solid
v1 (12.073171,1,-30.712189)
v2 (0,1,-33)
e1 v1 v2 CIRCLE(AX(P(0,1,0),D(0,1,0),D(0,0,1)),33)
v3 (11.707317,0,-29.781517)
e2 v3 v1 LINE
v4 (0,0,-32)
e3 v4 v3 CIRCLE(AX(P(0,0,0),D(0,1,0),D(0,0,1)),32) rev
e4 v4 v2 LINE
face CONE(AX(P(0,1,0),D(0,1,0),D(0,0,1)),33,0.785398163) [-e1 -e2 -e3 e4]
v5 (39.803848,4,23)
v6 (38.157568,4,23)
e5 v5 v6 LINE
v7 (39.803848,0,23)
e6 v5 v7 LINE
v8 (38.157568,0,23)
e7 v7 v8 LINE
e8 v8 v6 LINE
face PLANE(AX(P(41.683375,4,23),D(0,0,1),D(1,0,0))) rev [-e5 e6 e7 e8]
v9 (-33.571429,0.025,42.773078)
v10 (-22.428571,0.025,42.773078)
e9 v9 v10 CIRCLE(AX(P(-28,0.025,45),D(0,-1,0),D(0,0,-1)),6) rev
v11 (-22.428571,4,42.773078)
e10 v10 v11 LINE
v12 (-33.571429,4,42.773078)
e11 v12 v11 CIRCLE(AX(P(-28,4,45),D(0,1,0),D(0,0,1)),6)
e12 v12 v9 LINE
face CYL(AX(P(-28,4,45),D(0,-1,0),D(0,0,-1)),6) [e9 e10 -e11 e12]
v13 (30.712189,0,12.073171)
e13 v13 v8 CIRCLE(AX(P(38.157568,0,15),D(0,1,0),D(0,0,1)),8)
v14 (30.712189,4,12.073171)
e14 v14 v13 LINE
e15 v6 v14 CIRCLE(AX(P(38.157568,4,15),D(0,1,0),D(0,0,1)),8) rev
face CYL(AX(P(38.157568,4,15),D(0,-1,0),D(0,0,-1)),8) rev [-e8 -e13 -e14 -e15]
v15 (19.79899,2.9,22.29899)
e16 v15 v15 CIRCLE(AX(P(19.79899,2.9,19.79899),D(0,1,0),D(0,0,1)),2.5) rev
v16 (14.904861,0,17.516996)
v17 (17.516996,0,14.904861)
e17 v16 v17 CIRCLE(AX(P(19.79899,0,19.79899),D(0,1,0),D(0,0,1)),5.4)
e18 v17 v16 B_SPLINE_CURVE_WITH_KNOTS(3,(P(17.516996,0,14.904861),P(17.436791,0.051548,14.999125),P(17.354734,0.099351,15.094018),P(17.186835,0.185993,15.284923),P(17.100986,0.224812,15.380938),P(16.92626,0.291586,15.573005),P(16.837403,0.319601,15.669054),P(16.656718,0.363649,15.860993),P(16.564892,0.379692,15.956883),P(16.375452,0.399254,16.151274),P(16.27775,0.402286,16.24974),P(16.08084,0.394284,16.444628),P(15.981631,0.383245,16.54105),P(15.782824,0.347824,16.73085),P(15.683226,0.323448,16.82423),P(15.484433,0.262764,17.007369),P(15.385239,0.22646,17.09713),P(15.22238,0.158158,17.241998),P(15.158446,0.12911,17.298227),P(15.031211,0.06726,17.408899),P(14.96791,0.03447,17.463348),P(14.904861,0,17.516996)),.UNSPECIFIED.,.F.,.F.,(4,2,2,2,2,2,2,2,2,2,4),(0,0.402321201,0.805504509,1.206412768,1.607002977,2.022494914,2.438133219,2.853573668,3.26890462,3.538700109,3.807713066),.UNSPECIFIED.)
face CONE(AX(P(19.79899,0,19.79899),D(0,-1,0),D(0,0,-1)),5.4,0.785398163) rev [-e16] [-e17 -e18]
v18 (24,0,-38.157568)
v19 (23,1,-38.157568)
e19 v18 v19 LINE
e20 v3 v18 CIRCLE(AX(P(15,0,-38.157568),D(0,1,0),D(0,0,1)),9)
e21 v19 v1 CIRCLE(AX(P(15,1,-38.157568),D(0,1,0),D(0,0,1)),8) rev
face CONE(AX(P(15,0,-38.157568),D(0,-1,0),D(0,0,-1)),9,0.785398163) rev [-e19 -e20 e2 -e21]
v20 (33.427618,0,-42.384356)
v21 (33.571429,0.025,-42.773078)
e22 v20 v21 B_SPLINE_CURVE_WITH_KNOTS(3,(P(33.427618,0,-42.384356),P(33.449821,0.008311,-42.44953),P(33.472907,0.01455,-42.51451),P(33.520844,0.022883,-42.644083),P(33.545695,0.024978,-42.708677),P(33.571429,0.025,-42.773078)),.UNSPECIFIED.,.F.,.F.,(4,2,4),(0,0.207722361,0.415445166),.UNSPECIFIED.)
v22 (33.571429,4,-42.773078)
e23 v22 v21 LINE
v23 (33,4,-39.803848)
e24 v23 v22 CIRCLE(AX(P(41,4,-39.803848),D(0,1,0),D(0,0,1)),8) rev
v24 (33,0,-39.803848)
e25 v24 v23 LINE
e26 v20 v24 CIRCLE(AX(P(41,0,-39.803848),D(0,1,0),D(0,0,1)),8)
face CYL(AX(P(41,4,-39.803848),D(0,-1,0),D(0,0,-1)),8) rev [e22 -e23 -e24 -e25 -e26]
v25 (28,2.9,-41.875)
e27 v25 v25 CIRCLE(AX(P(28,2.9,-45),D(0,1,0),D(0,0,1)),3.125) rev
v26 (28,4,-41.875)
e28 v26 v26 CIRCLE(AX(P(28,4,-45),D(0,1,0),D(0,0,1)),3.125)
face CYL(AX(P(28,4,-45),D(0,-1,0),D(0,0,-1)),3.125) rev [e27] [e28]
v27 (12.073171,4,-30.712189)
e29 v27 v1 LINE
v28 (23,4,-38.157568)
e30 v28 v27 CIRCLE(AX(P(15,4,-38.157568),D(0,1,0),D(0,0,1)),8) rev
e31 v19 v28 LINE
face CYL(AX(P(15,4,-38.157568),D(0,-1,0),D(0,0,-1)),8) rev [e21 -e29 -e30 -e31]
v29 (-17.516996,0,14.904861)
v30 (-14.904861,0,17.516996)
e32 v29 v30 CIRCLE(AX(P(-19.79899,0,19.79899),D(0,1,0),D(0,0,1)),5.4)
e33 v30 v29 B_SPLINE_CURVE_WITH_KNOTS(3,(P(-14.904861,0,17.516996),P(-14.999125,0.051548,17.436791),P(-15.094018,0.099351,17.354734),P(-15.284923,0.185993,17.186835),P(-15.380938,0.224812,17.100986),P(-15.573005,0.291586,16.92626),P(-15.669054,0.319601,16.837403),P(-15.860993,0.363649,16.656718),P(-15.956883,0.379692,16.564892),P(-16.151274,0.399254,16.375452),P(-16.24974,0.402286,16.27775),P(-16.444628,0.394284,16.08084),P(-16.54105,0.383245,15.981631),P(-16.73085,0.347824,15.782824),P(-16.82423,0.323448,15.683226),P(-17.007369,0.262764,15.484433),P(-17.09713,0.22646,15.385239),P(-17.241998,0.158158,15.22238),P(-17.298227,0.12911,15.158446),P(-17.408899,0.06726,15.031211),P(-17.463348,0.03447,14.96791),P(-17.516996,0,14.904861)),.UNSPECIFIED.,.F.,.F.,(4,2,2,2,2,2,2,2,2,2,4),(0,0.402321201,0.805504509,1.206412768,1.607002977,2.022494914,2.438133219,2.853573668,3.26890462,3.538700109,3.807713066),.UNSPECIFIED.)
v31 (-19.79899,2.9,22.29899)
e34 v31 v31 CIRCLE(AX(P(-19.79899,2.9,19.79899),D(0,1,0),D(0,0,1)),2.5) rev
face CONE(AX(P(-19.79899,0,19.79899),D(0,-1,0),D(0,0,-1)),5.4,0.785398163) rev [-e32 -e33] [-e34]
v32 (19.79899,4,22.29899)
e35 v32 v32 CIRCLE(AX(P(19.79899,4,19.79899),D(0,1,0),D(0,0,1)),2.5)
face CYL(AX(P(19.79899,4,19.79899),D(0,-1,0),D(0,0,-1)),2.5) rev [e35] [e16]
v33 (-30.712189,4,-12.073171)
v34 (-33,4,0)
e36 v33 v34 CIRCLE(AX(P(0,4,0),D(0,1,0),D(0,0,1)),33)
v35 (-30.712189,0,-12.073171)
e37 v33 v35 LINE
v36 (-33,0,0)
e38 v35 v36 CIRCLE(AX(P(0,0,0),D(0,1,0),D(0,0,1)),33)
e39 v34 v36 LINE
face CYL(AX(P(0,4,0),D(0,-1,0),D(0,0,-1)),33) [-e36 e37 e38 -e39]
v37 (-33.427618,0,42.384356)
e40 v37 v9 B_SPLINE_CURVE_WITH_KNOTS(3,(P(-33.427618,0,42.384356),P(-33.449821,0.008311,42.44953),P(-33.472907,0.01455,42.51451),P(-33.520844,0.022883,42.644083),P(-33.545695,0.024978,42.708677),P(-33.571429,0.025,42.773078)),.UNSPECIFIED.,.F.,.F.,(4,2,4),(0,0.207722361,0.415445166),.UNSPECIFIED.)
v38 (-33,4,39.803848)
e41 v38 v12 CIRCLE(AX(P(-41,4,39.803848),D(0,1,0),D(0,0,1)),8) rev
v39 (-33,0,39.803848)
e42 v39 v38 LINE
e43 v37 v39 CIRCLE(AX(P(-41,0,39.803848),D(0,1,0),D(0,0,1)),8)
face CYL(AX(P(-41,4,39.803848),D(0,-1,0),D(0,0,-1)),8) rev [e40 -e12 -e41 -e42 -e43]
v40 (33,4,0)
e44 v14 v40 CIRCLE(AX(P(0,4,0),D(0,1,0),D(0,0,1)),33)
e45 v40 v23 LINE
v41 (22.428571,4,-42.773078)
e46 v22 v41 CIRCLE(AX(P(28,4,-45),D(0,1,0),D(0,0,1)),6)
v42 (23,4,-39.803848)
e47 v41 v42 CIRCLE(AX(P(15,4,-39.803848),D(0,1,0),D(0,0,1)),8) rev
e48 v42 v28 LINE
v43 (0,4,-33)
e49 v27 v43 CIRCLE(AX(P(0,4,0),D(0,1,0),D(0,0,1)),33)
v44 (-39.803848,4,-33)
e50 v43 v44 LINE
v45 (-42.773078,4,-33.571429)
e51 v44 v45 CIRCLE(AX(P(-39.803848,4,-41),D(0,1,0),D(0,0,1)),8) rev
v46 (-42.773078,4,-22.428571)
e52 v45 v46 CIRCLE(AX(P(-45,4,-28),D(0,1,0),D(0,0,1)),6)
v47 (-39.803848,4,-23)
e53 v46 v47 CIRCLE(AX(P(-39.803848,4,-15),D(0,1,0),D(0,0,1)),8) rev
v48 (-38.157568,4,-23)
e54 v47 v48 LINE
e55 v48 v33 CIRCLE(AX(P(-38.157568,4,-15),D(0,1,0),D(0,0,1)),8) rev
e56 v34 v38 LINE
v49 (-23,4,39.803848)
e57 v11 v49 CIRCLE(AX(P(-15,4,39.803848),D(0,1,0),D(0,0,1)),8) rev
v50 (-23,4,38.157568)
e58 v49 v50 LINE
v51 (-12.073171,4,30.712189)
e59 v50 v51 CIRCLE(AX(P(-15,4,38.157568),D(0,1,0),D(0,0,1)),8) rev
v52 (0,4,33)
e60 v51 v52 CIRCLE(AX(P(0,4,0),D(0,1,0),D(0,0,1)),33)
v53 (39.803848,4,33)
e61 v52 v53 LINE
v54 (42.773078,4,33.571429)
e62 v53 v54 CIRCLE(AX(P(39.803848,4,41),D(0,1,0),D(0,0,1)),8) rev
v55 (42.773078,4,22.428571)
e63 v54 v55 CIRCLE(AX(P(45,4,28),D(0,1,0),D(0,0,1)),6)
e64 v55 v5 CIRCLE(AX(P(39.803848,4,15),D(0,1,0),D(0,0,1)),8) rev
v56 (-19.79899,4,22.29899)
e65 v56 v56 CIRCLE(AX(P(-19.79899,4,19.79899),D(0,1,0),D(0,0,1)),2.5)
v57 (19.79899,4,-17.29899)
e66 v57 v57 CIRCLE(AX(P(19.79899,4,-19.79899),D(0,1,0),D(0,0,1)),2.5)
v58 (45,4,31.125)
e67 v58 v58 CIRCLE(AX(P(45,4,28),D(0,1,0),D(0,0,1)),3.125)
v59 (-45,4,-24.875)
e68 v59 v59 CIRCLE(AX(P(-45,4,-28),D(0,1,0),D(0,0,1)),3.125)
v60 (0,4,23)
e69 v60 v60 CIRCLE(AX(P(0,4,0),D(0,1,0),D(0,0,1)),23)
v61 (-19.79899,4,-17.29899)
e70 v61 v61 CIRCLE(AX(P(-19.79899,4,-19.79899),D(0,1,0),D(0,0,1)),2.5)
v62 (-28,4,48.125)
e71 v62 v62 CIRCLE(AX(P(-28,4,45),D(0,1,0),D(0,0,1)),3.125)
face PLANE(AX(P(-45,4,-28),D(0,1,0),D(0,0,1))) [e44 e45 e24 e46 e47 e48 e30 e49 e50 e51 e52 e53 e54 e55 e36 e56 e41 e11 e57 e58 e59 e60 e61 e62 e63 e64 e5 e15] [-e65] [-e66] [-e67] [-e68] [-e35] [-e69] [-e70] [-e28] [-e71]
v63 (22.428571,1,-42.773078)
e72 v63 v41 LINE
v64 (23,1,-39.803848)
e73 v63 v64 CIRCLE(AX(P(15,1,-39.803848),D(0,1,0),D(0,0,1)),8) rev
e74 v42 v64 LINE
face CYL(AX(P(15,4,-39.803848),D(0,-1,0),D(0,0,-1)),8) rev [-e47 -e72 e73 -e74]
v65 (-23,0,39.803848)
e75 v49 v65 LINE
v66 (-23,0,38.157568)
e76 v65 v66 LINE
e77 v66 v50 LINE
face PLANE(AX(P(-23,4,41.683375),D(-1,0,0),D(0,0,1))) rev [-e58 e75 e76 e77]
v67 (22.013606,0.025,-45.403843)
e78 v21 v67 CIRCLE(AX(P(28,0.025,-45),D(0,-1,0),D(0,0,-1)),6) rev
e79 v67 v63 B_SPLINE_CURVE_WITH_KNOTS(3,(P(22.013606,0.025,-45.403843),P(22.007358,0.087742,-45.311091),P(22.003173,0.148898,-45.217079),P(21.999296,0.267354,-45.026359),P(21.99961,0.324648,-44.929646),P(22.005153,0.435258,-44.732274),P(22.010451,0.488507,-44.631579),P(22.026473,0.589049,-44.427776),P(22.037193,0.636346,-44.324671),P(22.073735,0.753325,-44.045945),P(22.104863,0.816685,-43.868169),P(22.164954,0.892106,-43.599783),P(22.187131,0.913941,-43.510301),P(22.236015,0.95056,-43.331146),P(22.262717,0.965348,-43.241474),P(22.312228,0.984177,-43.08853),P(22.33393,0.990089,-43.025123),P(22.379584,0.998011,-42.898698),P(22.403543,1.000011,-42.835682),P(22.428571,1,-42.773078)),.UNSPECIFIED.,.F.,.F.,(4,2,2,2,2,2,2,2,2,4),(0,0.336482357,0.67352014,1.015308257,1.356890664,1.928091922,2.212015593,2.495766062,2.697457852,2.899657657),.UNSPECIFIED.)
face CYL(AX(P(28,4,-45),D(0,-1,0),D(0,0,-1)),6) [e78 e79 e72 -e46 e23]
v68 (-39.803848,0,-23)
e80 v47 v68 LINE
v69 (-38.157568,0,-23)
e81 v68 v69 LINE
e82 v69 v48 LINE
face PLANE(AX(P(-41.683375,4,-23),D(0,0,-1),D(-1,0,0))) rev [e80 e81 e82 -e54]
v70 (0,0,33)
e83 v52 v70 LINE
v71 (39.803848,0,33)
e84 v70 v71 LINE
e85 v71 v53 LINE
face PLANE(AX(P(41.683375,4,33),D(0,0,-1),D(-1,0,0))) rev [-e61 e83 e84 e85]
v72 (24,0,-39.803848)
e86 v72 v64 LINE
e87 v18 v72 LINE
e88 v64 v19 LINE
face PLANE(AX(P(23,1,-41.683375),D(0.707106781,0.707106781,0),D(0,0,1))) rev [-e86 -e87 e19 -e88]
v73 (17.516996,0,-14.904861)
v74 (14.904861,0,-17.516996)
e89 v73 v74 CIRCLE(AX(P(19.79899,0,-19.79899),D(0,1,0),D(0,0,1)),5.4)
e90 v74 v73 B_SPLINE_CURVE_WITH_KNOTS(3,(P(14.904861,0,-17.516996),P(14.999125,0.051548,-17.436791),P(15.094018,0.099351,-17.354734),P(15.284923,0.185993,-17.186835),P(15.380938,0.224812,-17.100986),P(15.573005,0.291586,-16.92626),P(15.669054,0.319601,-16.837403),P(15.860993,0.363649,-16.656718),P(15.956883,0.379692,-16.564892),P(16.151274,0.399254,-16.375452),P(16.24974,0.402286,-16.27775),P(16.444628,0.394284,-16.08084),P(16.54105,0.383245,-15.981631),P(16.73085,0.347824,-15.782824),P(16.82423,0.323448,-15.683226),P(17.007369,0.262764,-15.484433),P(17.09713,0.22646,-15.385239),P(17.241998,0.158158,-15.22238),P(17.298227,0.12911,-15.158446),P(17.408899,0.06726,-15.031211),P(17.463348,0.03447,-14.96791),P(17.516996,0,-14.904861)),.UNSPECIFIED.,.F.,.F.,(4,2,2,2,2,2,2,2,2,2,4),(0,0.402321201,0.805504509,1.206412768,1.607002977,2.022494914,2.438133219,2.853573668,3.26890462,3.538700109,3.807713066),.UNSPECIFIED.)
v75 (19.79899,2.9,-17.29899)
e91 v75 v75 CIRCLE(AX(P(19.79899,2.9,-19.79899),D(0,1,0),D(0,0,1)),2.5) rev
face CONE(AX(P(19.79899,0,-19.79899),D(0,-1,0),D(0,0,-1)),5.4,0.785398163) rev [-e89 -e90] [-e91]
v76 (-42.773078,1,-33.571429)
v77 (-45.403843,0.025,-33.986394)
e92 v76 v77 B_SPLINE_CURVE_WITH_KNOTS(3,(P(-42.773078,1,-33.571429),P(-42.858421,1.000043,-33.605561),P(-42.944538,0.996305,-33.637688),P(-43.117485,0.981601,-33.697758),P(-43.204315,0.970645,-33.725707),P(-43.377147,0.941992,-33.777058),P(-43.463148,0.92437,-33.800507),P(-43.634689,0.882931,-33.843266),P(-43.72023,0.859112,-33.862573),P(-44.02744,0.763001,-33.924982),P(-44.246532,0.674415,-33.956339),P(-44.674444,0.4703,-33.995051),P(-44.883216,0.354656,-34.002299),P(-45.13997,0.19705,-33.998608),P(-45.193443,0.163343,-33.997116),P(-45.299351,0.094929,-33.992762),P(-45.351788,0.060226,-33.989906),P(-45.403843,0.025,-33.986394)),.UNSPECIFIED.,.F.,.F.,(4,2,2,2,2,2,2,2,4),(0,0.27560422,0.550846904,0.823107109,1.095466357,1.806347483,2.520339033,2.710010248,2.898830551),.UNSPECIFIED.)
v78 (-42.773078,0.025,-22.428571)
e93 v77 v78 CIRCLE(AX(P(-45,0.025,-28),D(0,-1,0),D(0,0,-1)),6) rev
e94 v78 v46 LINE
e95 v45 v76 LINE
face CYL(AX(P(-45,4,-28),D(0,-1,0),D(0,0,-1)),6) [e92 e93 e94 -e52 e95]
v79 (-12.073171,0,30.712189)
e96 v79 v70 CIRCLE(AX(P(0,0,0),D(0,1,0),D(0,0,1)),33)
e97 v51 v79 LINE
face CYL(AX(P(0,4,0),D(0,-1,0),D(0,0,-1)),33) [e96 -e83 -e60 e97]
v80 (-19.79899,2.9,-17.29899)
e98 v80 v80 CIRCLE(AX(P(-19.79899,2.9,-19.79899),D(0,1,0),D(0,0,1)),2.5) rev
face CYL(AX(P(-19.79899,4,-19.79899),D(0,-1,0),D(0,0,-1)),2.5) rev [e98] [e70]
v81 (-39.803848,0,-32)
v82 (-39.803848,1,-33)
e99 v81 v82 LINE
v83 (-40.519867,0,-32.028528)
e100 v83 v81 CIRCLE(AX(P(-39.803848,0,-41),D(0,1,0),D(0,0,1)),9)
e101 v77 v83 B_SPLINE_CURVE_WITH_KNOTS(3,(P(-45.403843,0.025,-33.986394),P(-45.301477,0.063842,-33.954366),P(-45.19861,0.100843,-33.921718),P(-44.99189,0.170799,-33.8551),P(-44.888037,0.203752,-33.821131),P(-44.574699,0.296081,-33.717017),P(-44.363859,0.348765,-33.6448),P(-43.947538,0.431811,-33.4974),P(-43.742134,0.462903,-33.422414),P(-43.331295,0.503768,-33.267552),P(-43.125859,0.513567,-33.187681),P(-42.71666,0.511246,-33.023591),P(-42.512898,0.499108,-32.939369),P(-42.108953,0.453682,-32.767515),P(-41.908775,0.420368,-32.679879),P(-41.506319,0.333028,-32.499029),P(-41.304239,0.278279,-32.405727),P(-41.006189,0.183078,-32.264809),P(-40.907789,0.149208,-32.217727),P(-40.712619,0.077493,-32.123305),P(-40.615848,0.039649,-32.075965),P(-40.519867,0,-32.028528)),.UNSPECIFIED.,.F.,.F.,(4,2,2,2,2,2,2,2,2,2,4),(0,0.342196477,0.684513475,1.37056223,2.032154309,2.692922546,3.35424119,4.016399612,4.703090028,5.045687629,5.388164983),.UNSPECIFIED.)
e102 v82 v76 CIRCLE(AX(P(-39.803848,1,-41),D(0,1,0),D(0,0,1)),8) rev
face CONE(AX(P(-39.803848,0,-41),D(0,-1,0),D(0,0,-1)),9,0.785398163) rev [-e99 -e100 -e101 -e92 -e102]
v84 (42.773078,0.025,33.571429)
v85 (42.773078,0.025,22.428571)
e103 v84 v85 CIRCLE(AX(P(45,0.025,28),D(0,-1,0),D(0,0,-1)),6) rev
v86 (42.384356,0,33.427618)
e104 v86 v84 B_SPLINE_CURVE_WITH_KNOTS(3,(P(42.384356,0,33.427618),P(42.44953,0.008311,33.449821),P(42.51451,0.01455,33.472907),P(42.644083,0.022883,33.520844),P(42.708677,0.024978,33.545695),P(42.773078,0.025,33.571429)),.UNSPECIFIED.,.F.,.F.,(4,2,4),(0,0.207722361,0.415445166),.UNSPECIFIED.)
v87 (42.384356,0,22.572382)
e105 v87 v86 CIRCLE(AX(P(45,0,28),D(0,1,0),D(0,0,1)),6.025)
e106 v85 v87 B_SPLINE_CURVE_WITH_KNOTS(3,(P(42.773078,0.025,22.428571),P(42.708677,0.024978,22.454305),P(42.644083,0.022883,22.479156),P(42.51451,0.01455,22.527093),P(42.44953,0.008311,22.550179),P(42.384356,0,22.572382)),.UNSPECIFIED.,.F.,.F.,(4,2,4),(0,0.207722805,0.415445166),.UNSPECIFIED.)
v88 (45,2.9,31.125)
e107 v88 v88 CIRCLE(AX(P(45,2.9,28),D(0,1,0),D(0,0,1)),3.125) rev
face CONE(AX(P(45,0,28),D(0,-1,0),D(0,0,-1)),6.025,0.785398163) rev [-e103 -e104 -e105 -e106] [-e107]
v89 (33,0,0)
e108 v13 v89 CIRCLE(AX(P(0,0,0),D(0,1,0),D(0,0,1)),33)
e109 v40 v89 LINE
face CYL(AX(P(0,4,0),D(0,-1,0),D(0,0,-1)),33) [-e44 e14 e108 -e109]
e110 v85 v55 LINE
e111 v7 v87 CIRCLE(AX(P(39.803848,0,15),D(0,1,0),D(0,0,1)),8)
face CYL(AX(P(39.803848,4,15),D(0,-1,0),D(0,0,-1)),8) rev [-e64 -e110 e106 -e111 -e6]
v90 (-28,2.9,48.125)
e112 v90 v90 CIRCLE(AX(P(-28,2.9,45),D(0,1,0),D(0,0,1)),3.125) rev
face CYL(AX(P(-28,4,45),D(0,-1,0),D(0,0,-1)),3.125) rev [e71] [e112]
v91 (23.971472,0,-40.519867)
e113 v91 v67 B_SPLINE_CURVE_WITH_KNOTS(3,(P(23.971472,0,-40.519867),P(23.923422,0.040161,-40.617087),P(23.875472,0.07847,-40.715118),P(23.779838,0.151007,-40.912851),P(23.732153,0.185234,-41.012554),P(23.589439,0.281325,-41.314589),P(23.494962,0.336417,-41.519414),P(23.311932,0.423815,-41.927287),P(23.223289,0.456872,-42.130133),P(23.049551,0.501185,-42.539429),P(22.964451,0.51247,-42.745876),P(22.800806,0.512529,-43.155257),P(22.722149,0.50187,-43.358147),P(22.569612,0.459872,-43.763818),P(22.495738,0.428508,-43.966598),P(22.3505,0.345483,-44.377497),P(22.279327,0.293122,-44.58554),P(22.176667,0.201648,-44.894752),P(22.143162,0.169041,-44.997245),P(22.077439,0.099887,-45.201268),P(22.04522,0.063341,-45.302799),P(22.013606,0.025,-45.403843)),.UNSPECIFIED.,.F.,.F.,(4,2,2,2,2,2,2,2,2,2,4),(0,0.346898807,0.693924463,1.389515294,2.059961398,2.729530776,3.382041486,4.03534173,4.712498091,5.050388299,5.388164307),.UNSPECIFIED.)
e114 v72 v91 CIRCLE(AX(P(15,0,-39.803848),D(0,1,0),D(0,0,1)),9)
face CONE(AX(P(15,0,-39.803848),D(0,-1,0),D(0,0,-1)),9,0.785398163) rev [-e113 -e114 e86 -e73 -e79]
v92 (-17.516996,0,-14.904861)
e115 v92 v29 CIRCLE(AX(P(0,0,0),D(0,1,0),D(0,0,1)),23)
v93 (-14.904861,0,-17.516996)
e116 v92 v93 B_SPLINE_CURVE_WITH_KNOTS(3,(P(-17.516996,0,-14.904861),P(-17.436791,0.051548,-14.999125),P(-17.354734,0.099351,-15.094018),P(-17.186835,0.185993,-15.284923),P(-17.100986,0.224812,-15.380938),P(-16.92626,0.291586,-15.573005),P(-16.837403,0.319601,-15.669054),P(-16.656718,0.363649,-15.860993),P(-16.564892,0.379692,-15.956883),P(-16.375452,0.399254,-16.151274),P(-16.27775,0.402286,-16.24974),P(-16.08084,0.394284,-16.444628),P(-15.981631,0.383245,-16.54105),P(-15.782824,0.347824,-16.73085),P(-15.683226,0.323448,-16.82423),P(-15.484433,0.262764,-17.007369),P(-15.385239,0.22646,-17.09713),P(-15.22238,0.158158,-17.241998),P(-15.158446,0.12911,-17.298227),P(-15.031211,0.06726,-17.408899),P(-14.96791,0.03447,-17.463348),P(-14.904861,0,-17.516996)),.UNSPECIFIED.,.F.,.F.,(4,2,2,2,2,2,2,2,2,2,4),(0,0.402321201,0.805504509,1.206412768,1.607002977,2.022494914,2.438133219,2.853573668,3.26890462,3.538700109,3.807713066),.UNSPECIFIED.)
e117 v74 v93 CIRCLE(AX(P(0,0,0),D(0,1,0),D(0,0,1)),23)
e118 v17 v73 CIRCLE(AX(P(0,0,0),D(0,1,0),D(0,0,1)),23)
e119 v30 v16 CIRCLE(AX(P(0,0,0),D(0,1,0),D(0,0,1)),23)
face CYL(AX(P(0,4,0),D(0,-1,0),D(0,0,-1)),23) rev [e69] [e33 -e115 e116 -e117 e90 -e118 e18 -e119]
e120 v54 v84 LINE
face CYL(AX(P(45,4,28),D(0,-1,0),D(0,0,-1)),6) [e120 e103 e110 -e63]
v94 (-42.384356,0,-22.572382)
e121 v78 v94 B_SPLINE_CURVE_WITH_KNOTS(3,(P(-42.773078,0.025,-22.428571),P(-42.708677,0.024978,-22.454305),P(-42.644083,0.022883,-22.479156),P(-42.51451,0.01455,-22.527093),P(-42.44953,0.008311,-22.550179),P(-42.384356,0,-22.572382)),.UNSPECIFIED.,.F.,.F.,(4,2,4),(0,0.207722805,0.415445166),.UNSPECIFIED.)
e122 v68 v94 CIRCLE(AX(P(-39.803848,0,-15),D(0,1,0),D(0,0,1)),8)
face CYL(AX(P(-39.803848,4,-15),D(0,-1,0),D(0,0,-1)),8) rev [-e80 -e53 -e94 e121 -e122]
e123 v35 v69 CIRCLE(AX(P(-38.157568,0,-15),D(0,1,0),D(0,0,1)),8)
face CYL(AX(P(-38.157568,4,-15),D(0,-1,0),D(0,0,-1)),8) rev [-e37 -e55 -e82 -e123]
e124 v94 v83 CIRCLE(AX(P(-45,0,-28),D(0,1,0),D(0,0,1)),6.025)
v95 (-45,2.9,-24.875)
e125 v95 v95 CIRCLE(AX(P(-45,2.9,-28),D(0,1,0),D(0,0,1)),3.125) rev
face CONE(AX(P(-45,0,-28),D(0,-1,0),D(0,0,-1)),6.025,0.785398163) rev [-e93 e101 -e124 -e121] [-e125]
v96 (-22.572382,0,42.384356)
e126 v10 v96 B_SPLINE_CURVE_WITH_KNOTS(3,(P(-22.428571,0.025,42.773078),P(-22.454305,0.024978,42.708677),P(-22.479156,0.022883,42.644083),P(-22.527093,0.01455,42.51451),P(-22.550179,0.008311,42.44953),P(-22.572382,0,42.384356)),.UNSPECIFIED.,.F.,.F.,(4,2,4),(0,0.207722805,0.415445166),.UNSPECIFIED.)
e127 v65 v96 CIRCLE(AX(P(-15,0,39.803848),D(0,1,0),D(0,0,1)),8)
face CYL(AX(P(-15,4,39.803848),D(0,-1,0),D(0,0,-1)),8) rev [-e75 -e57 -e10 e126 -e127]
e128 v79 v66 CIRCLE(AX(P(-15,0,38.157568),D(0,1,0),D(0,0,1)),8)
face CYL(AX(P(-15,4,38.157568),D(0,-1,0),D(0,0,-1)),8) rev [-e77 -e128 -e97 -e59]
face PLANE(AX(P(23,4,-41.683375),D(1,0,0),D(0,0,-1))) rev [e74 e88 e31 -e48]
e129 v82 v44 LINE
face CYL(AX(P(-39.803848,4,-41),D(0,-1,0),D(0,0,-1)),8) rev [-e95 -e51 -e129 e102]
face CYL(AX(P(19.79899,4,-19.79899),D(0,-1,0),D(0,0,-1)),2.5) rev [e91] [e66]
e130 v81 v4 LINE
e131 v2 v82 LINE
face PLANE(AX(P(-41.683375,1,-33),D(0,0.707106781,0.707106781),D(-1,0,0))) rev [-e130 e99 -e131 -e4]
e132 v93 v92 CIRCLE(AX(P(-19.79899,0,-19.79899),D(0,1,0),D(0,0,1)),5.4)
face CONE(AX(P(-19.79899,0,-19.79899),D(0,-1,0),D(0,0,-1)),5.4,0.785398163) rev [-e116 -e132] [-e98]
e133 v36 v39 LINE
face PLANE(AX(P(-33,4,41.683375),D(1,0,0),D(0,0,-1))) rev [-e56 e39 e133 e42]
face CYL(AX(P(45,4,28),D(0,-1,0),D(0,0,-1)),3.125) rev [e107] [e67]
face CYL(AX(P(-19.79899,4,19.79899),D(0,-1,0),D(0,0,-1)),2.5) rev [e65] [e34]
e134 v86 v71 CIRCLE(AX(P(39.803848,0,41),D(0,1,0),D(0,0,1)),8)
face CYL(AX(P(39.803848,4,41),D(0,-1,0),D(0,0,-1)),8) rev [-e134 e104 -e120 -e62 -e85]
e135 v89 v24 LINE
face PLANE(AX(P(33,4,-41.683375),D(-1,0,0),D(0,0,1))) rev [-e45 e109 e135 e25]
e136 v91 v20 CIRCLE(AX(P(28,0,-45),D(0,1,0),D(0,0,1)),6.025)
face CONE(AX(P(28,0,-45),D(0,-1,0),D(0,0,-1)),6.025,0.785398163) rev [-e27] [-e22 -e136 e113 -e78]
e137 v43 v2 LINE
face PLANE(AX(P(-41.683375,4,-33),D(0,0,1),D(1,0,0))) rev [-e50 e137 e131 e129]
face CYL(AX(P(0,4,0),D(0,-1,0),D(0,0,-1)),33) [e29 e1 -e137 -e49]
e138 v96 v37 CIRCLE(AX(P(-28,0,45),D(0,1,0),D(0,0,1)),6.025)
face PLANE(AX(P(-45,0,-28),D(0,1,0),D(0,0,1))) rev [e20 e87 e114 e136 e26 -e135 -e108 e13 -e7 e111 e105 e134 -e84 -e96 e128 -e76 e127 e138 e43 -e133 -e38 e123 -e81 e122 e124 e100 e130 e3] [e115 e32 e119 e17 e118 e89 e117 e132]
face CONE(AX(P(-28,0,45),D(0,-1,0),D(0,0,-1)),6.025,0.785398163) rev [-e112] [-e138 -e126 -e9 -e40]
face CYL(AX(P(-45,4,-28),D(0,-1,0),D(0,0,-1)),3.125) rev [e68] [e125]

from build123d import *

# Parameters (mm, degrees)
SKETCH1_R           = 23
SKETCH1_R_2         = 2.5
SKETCH1_R_3         = 3.125
BOSS_EXTRUDE1_DEPTH = 4
FILLET1_R           = 8
CHAMFER1_SIZE       = 2.9


with BuildPart() as part:
    # Sketch1 → Boss-Extrude1 (new body)
    with BuildSketch(Plane(origin=(0, 0, 0), x_dir=(1, 0, 0), z_dir=(0, 1, 0))):
        with BuildLine():
            Line((-41.68337521, 33), (0, 33))
            ThreePointArc((0, 33), (12.411234198, 30.577136322), (23, 23.664319132))
            Line((23, 23.664319132), (23, 41.68337521))
            ThreePointArc((23, 41.68337521), (28, 51), (33, 41.68337521))
            Line((33, 41.68337521), (33, 0))
            ThreePointArc((33, 0), (30.577136322, -12.411234198), (23.664319132, -23))
            Line((23.664319132, -23), (41.68337521, -23))
            ThreePointArc((41.68337521, -23), (51, -28), (41.68337521, -33))
            Line((41.68337521, -33), (0, -33))
            ThreePointArc((0, -33), (-12.411234198, -30.577136322), (-23, -23.664319132))
            Line((-23, -23.664319132), (-23, -41.68337521))
            ThreePointArc((-23, -41.68337521), (-28, -51), (-33, -41.68337521))
            Line((-33, -41.68337521), (-33, 0))
            ThreePointArc((-33, 0), (-30.577136322, 12.411234198), (-23.664319132, 23))
            Line((-23.664319132, 23), (-41.68337521, 23))
            ThreePointArc((-41.68337521, 23), (-51, 28), (-41.68337521, 33))
        make_face()
        with Locations(Location((0, 0, 0), (0, 0, 270))):
            Circle(SKETCH1_R, mode=Mode.SUBTRACT)
        with Locations(Location((-19.798989873, 19.798989873, 0), (0, 0, 270))):
            Circle(SKETCH1_R_2, mode=Mode.SUBTRACT)
        with Locations(Location((19.798989873, 19.798989873, 0), (0, 0, 270))):
            Circle(SKETCH1_R_2, mode=Mode.SUBTRACT)
        with Locations(Location((19.798989873, -19.798989873, 0), (0, 0, 270))):
            Circle(SKETCH1_R_2, mode=Mode.SUBTRACT)
        with Locations(Location((-19.798989873, -19.798989873, 0), (0, 0, 270))):
            Circle(SKETCH1_R_2, mode=Mode.SUBTRACT)
        with Locations(Location((-45, 28, 0), (0, 0, 270))):
            Circle(SKETCH1_R_3, mode=Mode.SUBTRACT)
        with Locations(Location((28, 45, 0), (0, 0, 270))):
            Circle(SKETCH1_R_3, mode=Mode.SUBTRACT)
        with Locations(Location((45, -28, 0), (0, 0, 270))):
            Circle(SKETCH1_R_3, mode=Mode.SUBTRACT)
        with Locations(Location((-28, -45, 0), (0, 0, 270))):
            Circle(SKETCH1_R_3, mode=Mode.SUBTRACT)
    extrude(amount=BOSS_EXTRUDE1_DEPTH)

    # Fillet1
    fillet1_edges = [part.edges().sort_by_distance(p)[0] for p in [
        (-41.68337521, 2, -33),
        (23, 2, -23.664319132),
        (23, 2, -41.68337521),
        (33, 2, -41.68337521),
        (23.664319132, 2, 23),
        (41.68337521, 2, 23),
        (41.68337521, 2, 33),
        (-23, 2, 23.664319132),
        (-23, 2, 41.68337521),
        (-33, 2, 41.68337521),
        (-23.664319132, 2, -23),
        (-41.68337521, 2, -23),
    ]]
    fillet(fillet1_edges, radius=FILLET1_R)

    # Chamfer1
    # the kernel refuses this chamfer: 2.9 mm, written as the material it takes off along each edge
    with BuildSketch(Plane(origin=(-45, 0, -28), x_dir=(0, 0, 1), z_dir=(-1, 0, 0))) as chamfer1_piece_1:
        Polygon((3.125 + CHAMFER1_SIZE, 0), (3.125, CHAMFER1_SIZE), (3.125, 0), align=None)
    revolve(axis=Axis((-45, 0, -28), (0, 1, 0)), mode=Mode.SUBTRACT)
    with BuildSketch(Plane(origin=(-28, 0, 45), x_dir=(0, 0, 1), z_dir=(-1, 0, 0))) as chamfer1_piece_2:
        Polygon((3.125 + CHAMFER1_SIZE, 0), (3.125, CHAMFER1_SIZE), (3.125, 0), align=None)
    revolve(axis=Axis((-28, 0, 45), (0, 1, 0)), mode=Mode.SUBTRACT)
    with BuildSketch(Plane(origin=(45, 0, 28), x_dir=(0, 0, 1), z_dir=(-1, 0, 0))) as chamfer1_piece_3:
        Polygon((3.125 + CHAMFER1_SIZE, 0), (3.125, CHAMFER1_SIZE), (3.125, 0), align=None)
    revolve(axis=Axis((45, 0, 28), (0, 1, 0)), mode=Mode.SUBTRACT)
    with BuildSketch(Plane(origin=(28, 0, -45), x_dir=(0, 0, 1), z_dir=(-1, 0, 0))) as chamfer1_piece_4:
        Polygon((3.125 + CHAMFER1_SIZE, 0), (3.125, CHAMFER1_SIZE), (3.125, 0), align=None)
    revolve(axis=Axis((28, 0, -45), (0, 1, 0)), mode=Mode.SUBTRACT)
    with BuildSketch(Plane(origin=(19.798989873, 0, -19.798989873), x_dir=(0, 0, 1), z_dir=(-1, 0, 0))) as chamfer1_piece_5:
        Polygon((2.5 + CHAMFER1_SIZE, 0), (2.5, CHAMFER1_SIZE), (2.5, 0), align=None)
    revolve(axis=Axis((19.798989873, 0, -19.798989873), (0, 1, 0)), mode=Mode.SUBTRACT)
    with BuildSketch(Plane(origin=(19.798989873, 0, 19.798989873), x_dir=(0, 0, 1), z_dir=(-1, 0, 0))) as chamfer1_piece_6:
        Polygon((2.5 + CHAMFER1_SIZE, 0), (2.5, CHAMFER1_SIZE), (2.5, 0), align=None)
    revolve(axis=Axis((19.798989873, 0, 19.798989873), (0, 1, 0)), mode=Mode.SUBTRACT)
    with BuildSketch(Plane(origin=(-19.798989873, 0, 19.798989873), x_dir=(0, 0, 1), z_dir=(-1, 0, 0))) as chamfer1_piece_7:
        Polygon((2.5 + CHAMFER1_SIZE, 0), (2.5, CHAMFER1_SIZE), (2.5, 0), align=None)
    revolve(axis=Axis((-19.798989873, 0, 19.798989873), (0, 1, 0)), mode=Mode.SUBTRACT)
    with BuildSketch(Plane(origin=(-19.798989873, 0, -19.798989873), x_dir=(0, 0, 1), z_dir=(-1, 0, 0))) as chamfer1_piece_8:
        Polygon((2.5 + CHAMFER1_SIZE, 0), (2.5, CHAMFER1_SIZE), (2.5, 0), align=None)
    revolve(axis=Axis((-19.798989873, 0, -19.798989873), (0, 1, 0)), mode=Mode.SUBTRACT)

    # Chamfer2
    # the kernel refuses this chamfer: 1 mm, written as the material it takes off along each edge
    with BuildSketch(Plane(origin=(15, 0, -39.803847577), x_dir=(1, 0, 0), z_dir=(0, 0, 1))) as chamfer2_piece_1:
        with BuildLine():
            Line((9.028284271, -0.028284271), (7.971715729, 1.028284271))
            Line((7.971715729, 1.028284271), (7.951715729, 1.028284271))
            ThreePointArc((7.951715729, 1.028284271), (7.98, 0.514142136), (7.98, 0))
            Line((7.98, 0), (8, -0.02))
            ThreePointArc((8, -0.02), (8.514142136, -0.02), (9.028284271, -0.048284271))
            Line((9.028284271, -0.048284271), (9.028284271, -0.028284271))
        make_face()
    revolve(axis=Axis((15, 0, -39.803847577), (0, 1, 0)), revolution_arc=63.022782151, mode=Mode.SUBTRACT)
    with BuildSketch(Plane(origin=(23, 0, -38.157568057), x_dir=(0.9996219169112968, -0.02749587661058639, 0), z_dir=(0, 0, -1))) as chamfer2_piece_2:
        with BuildLine():
            Line((1.028673195, 0), (-0.056547155, -1.027117794))
            Line((-0.056547155, -1.027117794), (-0.076539593, -1.026567876))
            ThreePointArc((-0.076539593, -1.026567876), (-0.034129227, -0.51339783), (-0.019992438, 0.000549918))
            Line((-0.019992438, 0.000549918), (0.000549918, 0.019992438))
            ThreePointArc((0.000549918, 0.019992438), (0.514497665, 0.00585565), (1.029223113, 0.019992438))
            Line((1.029223113, 0.019992438), (1.028673195, 0))
        make_face()
    extrude(amount=1.646279521, mode=Mode.SUBTRACT)
    with BuildSketch(Plane(origin=(15, 0, -38.157568057), x_dir=(-0.3658536585365853, 0, 0.9306723916262885), z_dir=(-0.9306723916262885, 0, -0.3658536585365853))) as chamfer2_piece_3:
        with BuildLine():
            Line((9.028284271, -0.028284271), (7.971715729, 1.028284271))
            Line((7.971715729, 1.028284271), (7.951715729, 1.028284271))
            ThreePointArc((7.951715729, 1.028284271), (7.98, 0.514142136), (7.98, 0))
            Line((7.98, 0), (8, -0.02))
            ThreePointArc((8, -0.02), (8.514142136, -0.02), (9.028284271, -0.048284271))
            Line((9.028284271, -0.048284271), (9.028284271, -0.028284271))
        make_face()
    revolve(axis=Axis((15, 0, -38.157568057), (0, 1, 0)), revolution_arc=111.460127749, mode=Mode.SUBTRACT)
    with BuildSketch(Plane(origin=(0, 0, 0), x_dir=(0, 0, -1), z_dir=(-1, 0, 0))) as chamfer2_piece_4:
        with BuildLine():
            Line((31.971715729, 0.028284271), (33.028284271, -1.028284271))
            Line((33.028284271, -1.028284271), (33.048284271, -1.028284271))
            ThreePointArc((33.048284271, -1.028284271), (33.02, -0.514142136), (33.02, 0))
            Line((33.02, 0), (33, 0.02))
            ThreePointArc((33, 0.02), (32.485857864, 0.02), (31.971715729, 0.048284271))
            Line((31.971715729, 0.048284271), (31.971715729, 0.028284271))
        make_face()
    revolve(axis=Axis((0, 0, 0), (0, -1, 0)), revolution_arc=21.460127749, mode=Mode.SUBTRACT)
    with BuildSketch(Plane(origin=(-39.803847577, 0, -41), x_dir=(0, 0, 1), z_dir=(1, 0, 0))) as chamfer2_piece_5:
        with BuildLine():
            Line((9.028284271, 0.028284271), (7.971715729, -1.028284271))
            Line((7.971715729, -1.028284271), (7.951715729, -1.028284271))
            ThreePointArc((7.951715729, -1.028284271), (7.98, -0.514142136), (7.98, 0))
            Line((7.98, 0), (8, 0.02))
            ThreePointArc((8, 0.02), (8.514142136, 0.02), (9.028284271, 0.048284271))
            Line((9.028284271, 0.048284271), (9.028284271, 0.028284271))
        make_face()
    revolve(axis=Axis((-39.803847577, 0, -41), (0, -1, 0)), revolution_arc=63.022782151, mode=Mode.SUBTRACT)
    with BuildSketch(Plane(origin=(-39.803847577, 0, -33), x_dir=(0, 0.9996219169112968, -0.02749587661058908), z_dir=(1, 0, 0))) as chamfer2_piece_6:
        with BuildLine():
            Line((1.028673195, 0), (-0.056547155, 1.027117794))
            Line((-0.056547155, 1.027117794), (-0.076539593, 1.026567876))
            ThreePointArc((-0.076539593, 1.026567876), (-0.034129227, 0.51339783), (-0.019992438, -0.000549918))
            Line((-0.019992438, -0.000549918), (0.000549918, -0.019992438))
            ThreePointArc((0.000549918, -0.019992438), (0.514497665, -0.00585565), (1.029223113, -0.019992438))
            Line((1.029223113, -0.019992438), (1.028673195, 0))
        make_face()
    extrude(amount=39.803847577, mode=Mode.SUBTRACT)


solid = part.part
